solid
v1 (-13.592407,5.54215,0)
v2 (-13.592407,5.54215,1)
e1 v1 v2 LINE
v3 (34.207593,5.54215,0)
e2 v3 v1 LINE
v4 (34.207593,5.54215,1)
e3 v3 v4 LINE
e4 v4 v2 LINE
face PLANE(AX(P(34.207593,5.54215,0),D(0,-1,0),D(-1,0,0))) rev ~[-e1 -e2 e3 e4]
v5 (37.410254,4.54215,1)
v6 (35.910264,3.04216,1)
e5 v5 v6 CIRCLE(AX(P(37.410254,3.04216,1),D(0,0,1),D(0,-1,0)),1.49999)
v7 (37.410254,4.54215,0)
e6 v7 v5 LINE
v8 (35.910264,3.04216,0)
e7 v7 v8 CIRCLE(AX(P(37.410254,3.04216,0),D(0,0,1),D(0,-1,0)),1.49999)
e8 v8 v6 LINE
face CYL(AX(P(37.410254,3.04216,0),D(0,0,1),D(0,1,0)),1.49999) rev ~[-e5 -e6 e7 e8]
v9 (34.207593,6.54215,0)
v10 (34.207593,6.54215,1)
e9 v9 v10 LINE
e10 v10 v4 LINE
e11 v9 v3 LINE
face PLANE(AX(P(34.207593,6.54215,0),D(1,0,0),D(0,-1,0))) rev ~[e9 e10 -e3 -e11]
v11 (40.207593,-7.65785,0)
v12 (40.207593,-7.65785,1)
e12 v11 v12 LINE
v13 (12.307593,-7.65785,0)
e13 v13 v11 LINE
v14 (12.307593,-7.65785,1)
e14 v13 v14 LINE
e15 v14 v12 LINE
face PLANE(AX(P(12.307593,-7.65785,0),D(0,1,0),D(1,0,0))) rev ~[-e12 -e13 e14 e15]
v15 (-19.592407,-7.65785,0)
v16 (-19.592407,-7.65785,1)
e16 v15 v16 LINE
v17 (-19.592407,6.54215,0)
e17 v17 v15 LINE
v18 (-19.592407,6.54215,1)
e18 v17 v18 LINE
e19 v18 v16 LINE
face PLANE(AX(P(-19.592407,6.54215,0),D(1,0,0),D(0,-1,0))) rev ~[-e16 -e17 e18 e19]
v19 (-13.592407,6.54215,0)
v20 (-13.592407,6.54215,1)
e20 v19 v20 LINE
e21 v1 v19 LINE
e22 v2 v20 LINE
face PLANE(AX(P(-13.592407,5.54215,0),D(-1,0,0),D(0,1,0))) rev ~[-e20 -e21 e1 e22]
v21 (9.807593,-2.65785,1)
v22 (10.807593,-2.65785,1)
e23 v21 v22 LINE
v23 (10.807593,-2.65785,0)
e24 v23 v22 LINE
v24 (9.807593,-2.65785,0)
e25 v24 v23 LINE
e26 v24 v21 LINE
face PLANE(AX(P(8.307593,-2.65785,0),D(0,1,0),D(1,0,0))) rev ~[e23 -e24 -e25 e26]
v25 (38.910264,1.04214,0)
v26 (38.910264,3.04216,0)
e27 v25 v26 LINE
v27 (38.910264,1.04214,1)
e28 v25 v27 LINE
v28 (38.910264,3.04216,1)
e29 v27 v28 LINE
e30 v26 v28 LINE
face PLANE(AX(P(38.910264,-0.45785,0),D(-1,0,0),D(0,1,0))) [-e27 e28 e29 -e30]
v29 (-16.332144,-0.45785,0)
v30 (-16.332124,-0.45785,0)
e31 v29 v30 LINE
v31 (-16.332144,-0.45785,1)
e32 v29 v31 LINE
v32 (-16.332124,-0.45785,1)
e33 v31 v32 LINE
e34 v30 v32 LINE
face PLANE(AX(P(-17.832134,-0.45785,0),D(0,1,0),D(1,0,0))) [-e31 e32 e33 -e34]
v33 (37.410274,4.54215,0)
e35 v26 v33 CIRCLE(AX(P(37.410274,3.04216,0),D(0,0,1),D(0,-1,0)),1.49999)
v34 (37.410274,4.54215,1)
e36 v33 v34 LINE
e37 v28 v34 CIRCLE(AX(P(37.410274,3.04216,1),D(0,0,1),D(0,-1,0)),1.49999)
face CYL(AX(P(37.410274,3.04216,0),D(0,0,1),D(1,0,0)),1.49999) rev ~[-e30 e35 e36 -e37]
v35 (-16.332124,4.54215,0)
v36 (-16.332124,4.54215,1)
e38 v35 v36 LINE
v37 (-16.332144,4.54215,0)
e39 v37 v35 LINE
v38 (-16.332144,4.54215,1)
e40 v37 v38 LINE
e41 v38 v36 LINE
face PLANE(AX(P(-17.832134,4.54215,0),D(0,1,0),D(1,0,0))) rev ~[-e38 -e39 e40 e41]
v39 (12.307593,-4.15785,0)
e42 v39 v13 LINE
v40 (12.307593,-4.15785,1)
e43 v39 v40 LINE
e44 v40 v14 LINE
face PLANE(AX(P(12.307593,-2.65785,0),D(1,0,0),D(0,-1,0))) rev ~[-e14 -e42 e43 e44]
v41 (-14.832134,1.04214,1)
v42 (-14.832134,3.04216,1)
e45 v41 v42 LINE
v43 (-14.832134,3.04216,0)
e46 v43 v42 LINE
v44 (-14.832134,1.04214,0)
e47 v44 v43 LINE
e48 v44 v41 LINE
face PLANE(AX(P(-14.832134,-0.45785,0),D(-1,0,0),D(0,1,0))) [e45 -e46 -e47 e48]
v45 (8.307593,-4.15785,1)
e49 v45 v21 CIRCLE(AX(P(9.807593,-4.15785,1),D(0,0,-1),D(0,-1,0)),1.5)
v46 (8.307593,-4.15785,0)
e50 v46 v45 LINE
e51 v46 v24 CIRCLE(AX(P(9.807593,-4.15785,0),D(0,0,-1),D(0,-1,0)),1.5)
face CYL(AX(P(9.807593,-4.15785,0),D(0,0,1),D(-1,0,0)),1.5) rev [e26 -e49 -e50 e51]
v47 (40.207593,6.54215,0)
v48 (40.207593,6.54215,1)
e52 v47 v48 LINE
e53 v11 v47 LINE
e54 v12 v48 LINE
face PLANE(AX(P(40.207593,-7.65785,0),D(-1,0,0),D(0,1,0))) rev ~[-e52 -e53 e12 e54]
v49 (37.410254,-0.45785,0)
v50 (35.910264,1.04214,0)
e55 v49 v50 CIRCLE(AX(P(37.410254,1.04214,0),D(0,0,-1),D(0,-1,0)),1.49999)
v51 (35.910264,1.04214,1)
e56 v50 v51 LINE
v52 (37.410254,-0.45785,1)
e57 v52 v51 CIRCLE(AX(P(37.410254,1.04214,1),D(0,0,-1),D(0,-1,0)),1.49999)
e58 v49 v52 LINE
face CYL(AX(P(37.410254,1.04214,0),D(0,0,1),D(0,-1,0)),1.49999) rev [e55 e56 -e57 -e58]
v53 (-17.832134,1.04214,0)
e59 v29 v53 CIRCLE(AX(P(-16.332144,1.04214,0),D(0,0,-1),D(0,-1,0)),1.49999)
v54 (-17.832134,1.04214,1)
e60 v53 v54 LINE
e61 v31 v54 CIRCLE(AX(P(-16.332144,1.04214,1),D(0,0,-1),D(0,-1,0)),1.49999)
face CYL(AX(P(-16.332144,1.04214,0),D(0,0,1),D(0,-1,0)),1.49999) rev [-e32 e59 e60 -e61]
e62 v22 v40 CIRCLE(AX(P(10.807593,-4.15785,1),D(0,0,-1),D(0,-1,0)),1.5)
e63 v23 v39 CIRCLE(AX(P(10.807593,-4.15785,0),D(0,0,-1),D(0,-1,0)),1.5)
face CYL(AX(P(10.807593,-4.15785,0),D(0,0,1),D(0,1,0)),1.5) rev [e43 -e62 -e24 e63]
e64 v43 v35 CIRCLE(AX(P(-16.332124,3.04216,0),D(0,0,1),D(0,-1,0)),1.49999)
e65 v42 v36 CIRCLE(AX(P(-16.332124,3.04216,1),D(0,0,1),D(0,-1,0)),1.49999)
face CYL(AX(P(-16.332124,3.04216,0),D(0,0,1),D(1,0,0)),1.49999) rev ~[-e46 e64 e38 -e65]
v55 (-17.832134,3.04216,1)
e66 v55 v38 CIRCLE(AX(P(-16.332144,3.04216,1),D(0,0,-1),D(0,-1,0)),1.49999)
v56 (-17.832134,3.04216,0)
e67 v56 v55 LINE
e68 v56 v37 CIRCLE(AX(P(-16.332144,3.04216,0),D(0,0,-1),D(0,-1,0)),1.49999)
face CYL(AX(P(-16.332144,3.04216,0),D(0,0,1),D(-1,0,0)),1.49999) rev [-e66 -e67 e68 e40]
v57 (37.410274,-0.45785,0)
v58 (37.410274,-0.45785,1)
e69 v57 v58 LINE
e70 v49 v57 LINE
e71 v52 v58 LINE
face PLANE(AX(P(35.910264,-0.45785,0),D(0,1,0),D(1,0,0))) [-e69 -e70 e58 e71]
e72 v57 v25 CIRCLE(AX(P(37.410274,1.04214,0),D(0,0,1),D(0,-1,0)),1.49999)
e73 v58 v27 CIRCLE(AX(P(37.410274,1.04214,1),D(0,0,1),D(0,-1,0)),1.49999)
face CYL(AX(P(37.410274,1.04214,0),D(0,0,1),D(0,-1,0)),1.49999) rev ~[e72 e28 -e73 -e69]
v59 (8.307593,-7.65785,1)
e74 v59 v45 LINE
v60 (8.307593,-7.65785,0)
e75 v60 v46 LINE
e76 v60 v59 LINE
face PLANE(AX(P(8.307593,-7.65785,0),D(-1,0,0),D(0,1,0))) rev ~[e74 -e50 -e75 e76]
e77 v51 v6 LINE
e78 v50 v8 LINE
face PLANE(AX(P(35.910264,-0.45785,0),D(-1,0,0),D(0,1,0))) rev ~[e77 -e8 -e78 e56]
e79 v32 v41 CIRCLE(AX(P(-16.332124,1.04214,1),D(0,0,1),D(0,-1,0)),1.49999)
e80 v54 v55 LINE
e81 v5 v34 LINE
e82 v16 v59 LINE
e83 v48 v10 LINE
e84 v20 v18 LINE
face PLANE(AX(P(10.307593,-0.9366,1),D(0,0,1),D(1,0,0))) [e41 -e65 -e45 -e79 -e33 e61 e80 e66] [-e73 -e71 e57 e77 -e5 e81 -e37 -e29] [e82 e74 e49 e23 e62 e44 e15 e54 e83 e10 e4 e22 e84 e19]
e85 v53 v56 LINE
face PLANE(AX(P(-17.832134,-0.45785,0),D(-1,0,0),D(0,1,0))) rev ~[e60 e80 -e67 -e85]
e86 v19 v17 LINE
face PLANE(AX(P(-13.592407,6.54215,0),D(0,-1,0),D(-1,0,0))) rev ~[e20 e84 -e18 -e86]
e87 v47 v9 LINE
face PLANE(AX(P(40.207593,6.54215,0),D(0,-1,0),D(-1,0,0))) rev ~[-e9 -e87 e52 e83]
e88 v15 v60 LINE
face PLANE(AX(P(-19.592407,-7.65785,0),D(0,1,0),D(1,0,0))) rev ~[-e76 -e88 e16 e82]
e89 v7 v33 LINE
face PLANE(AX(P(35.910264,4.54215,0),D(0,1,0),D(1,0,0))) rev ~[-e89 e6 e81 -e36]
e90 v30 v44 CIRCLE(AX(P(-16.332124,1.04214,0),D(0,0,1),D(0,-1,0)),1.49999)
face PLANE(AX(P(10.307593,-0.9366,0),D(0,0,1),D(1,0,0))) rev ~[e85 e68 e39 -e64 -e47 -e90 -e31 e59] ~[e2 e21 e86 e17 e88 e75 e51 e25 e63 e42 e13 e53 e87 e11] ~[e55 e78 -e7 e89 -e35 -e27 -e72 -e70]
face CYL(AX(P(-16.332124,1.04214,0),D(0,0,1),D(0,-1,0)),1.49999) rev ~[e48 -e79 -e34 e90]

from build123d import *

# Parameters (mm, degrees)
F0_W     = 3
F0_H     = 5
F1_DEPTH = 1
F2_R     = 1.49999
F3_R     = 1.5


# Not quite as in the source:
# - a fillet or chamfer is up to 0.001 mm smaller than in the source, because OpenCascade refuses the exact size


with BuildPart() as f1:
    # F0 (on Top) → F1 (new body)
    with BuildSketch(Plane.XY):
        Polygon((-13.5924067289, 6.5421499412), (-19.5924067289, 6.5421499412), (-19.5924067289, -7.6578500588), (8.3075932711, -7.6578500588), (8.3075932711, -2.6578500588), (12.3075932711, -2.6578500588), (12.3075932711, -7.6578500588), (40.2075932711, -7.6578500588), (40.2075932711, 6.5421499412), (34.2075932711, 6.5421499412), (34.2075932711, 5.5421499412), (-13.5924067289, 5.5421499412), align=None)
        with Locations((-16.332133919, 2.0421499412)):
            Rectangle(F0_W, F0_H, mode=Mode.SUBTRACT)
        with Locations((37.4102636576, 2.0421499412)):
            Rectangle(F0_W, F0_H, mode=Mode.SUBTRACT)
    extrude(amount=F1_DEPTH)

    # F2 (radius 1.5 in the source; OpenCascade refuses exactly that, so slightly less here)
    f2_edges = [f1.edges().sort_by_distance(p)[0] for p in [
        (-17.832134, 4.54215, 0.5),
        (-14.832134, 4.54215, 0.5),
        (-14.832134, -0.45785, 0.5),
        (-17.832134, -0.45785, 0.5),
        (38.910264, 4.54215, 0.5),
        (35.910264, 4.54215, 0.5),
        (35.910264, -0.45785, 0.5),
        (38.910264, -0.45785, 0.5),
    ]]
    fillet(f2_edges, radius=F2_R)

    # F3
    f3_edges = [f1.edges().sort_by_distance(p)[0] for p in [
        (8.307593, -2.65785, 0.5),
        (12.307593, -2.65785, 0.5),
    ]]
    fillet(f3_edges, radius=F3_R)


solid = f1.part
